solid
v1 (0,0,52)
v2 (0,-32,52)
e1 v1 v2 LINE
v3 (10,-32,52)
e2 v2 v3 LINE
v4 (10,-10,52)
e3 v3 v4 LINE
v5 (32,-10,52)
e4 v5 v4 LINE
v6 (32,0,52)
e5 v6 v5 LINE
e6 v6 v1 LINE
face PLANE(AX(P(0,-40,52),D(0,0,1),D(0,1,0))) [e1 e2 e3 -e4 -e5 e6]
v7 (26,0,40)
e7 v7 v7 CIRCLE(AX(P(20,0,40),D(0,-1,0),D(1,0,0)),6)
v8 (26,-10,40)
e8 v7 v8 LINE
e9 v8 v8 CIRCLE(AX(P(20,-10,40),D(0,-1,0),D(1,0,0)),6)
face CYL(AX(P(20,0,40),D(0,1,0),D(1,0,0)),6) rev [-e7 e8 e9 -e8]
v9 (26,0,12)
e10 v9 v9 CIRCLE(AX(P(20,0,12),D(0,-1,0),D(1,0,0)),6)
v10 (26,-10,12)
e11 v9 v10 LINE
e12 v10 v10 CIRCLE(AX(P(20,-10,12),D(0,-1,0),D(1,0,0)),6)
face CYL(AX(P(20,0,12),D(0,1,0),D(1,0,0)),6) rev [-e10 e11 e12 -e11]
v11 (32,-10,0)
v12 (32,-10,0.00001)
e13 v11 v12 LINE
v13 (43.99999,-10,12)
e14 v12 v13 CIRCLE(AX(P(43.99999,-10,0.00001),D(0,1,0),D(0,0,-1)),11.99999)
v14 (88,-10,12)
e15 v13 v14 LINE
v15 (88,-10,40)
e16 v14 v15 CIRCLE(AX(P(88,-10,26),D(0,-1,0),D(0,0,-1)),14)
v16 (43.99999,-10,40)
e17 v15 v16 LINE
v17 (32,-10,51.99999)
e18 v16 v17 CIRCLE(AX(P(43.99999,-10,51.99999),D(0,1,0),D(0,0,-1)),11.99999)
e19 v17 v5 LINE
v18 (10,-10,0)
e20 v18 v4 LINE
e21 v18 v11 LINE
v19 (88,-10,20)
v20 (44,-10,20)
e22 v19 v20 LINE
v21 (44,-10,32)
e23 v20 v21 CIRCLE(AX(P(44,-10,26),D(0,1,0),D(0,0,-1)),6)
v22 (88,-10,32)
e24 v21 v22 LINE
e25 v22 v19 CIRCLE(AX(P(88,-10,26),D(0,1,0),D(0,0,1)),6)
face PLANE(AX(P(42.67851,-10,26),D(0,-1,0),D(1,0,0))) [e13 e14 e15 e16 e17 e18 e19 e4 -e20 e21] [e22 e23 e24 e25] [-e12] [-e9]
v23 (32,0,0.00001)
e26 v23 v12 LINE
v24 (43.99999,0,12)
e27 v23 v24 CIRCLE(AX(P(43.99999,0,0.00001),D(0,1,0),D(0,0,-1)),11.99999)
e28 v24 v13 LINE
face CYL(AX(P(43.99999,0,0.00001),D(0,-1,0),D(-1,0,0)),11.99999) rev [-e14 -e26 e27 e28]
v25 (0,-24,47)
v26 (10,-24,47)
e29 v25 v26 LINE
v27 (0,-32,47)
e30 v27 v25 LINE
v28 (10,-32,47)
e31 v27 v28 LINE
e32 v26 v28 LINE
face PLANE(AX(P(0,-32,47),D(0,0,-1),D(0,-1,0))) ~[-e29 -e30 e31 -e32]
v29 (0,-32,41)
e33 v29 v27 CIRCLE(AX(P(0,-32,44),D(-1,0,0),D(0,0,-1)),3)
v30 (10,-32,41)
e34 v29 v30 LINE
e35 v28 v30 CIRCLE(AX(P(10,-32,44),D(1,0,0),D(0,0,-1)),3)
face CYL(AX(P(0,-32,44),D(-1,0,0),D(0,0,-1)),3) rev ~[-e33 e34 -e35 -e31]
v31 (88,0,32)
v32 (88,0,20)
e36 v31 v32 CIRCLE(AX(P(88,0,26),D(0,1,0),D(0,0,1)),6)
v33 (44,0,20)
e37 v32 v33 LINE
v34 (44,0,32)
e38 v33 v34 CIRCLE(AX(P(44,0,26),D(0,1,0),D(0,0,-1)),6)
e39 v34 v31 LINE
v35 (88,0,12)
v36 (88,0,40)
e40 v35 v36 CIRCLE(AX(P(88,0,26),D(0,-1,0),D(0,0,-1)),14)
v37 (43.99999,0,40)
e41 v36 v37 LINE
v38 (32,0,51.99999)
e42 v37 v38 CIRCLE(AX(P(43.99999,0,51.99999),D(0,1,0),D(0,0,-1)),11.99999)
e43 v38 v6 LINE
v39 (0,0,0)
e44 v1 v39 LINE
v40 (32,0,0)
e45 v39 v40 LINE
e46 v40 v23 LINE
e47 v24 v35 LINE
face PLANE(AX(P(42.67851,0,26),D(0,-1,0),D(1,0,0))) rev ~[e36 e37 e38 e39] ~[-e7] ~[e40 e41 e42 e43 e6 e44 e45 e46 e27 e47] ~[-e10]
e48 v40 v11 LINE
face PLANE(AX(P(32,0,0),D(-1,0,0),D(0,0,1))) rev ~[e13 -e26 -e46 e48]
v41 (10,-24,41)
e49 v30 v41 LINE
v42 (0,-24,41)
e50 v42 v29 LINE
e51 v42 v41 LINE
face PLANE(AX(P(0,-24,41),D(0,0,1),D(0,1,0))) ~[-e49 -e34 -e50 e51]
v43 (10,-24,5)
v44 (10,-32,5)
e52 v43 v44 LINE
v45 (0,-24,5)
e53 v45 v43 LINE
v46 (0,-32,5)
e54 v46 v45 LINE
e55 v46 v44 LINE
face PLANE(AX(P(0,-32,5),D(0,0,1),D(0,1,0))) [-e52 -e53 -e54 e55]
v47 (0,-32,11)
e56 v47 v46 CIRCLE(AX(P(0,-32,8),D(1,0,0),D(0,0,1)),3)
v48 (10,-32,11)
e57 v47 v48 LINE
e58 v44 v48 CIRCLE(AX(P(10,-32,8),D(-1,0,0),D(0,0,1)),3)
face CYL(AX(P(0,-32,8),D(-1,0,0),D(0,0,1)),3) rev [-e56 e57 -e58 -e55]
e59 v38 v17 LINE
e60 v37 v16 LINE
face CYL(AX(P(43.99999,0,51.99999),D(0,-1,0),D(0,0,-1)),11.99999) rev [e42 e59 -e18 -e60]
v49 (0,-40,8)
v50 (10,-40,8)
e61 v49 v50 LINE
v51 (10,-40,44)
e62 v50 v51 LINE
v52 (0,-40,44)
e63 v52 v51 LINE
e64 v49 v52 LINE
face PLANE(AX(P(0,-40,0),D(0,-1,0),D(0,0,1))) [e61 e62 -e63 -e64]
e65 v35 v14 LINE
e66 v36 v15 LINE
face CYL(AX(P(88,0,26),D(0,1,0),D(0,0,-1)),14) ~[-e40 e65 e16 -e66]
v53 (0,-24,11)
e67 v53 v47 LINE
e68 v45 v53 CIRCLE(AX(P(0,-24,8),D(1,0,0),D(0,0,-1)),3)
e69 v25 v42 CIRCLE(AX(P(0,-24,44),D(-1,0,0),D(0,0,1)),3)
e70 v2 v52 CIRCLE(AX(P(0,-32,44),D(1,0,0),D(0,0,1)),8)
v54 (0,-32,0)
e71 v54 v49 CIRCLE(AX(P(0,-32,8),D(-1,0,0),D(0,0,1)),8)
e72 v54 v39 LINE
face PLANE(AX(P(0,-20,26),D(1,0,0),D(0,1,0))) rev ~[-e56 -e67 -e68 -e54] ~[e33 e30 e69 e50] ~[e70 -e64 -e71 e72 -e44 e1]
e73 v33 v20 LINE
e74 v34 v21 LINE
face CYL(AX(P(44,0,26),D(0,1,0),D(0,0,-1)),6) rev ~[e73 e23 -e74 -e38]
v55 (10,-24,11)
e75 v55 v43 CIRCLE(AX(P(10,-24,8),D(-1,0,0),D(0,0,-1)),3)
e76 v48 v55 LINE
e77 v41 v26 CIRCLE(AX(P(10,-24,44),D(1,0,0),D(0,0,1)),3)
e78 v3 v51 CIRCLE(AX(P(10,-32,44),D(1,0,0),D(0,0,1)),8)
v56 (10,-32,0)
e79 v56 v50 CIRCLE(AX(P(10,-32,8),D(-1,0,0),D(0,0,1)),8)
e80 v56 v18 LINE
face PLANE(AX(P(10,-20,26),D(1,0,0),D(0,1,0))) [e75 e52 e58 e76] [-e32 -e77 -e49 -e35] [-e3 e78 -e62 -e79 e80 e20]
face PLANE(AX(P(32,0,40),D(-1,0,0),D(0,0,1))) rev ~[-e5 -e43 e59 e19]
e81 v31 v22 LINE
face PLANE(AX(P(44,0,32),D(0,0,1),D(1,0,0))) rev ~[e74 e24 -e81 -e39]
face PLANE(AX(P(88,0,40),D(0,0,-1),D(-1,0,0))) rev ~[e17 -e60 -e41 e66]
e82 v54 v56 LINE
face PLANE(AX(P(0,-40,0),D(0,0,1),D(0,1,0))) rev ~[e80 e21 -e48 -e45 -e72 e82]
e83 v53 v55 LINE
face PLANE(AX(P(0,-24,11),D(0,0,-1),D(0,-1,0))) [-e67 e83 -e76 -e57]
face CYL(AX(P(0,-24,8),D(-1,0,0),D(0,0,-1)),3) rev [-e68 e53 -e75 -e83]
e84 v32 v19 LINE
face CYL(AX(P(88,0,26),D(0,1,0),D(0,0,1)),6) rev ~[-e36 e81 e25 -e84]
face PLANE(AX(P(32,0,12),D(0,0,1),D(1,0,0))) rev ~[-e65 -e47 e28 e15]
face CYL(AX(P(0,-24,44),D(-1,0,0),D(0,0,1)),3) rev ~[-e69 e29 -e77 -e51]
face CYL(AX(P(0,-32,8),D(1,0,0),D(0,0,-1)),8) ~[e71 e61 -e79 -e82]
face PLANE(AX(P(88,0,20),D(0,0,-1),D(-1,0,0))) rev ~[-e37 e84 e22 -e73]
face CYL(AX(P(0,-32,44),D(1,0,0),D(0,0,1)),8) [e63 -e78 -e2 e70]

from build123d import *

# Parameters (mm, degrees)
F0_R     = 6
F1_DEPTH = 10
F2_W     = 40
F2_H     = 52
F3_DEPTH = 10
F4_R     = 11.99999
F5_R     = 8
F7_DEPTH = 102.001


# Not quite as in the source:
# - a fillet or chamfer is up to 0.001 mm smaller than in the source, because OpenCascade refuses the exact size


with BuildPart() as f1:
    # F0 (on Front) → F1 (new body)
    with BuildSketch(Plane.XZ):
        with BuildLine():
            Line((32, 52), (0, 52))
            Line((0, 52), (0, 0))
            Line((0, 0), (32, 0))
            Line((32, 0), (32, 12))
            Line((32, 12), (88, 12))
            ThreePointArc((88, 12), (102, 26), (88, 40))
            Line((88, 40), (32, 40))
            Line((32, 40), (32, 52))
        make_face()
        with Locations((20, 12)):
            Circle(F0_R, mode=Mode.SUBTRACT)
        with Locations((20, 40)):
            Circle(F0_R, mode=Mode.SUBTRACT)
        with BuildLine():
            ThreePointArc((44, 20), (38, 26), (44, 32))
            Line((44, 32), (88, 32))
            ThreePointArc((88, 32), (94, 26), (88, 20))
            Line((88, 20), (44, 20))
        make_face(mode=Mode.SUBTRACT)
    extrude(amount=F1_DEPTH)

    # F2 (on Right) → F3 (join)
    with BuildSketch(Plane.YZ):
        with Locations((-20, 26)):
            Rectangle(F2_W, F2_H)
    extrude(amount=F3_DEPTH)

    # F4 (radius 12 in the source; OpenCascade refuses exactly that, so slightly less here)
    f4_edges = [f1.edges().sort_by_distance(p)[0] for p in [
        (32, -5, 40),
        (32, -5, 12),
    ]]
    fillet(f4_edges, radius=F4_R)

    # F5
    f5_edges = [f1.edges().sort_by_distance(p)[0] for p in [
        (5, -40, 0),
        (5, -40, 52),
    ]]
    fillet(f5_edges, radius=F5_R)

    # F6 (on Right) → F7 (cut, through all)
    with BuildSketch(Plane.YZ):
        with BuildLine():
            Line((-24, 11), (-32, 11))
            ThreePointArc((-32, 11), (-35, 8), (-32, 5))
            Line((-32, 5), (-24, 5))
            ThreePointArc((-24, 5), (-21, 8), (-24, 11))
        make_face()
    extrude(amount=F7_DEPTH, mode=Mode.SUBTRACT)

    # F9: F1 across plane


with BuildPart() as f1_1:
    add(f1.part)
    add(f1.part.mirror(Plane(origin=(11.5185185185, -11.5185185185, 26), x_dir=(1, 0, 0), z_dir=(0, 0, 1))), mode=Mode.INTERSECT)


solid = f1_1.part
